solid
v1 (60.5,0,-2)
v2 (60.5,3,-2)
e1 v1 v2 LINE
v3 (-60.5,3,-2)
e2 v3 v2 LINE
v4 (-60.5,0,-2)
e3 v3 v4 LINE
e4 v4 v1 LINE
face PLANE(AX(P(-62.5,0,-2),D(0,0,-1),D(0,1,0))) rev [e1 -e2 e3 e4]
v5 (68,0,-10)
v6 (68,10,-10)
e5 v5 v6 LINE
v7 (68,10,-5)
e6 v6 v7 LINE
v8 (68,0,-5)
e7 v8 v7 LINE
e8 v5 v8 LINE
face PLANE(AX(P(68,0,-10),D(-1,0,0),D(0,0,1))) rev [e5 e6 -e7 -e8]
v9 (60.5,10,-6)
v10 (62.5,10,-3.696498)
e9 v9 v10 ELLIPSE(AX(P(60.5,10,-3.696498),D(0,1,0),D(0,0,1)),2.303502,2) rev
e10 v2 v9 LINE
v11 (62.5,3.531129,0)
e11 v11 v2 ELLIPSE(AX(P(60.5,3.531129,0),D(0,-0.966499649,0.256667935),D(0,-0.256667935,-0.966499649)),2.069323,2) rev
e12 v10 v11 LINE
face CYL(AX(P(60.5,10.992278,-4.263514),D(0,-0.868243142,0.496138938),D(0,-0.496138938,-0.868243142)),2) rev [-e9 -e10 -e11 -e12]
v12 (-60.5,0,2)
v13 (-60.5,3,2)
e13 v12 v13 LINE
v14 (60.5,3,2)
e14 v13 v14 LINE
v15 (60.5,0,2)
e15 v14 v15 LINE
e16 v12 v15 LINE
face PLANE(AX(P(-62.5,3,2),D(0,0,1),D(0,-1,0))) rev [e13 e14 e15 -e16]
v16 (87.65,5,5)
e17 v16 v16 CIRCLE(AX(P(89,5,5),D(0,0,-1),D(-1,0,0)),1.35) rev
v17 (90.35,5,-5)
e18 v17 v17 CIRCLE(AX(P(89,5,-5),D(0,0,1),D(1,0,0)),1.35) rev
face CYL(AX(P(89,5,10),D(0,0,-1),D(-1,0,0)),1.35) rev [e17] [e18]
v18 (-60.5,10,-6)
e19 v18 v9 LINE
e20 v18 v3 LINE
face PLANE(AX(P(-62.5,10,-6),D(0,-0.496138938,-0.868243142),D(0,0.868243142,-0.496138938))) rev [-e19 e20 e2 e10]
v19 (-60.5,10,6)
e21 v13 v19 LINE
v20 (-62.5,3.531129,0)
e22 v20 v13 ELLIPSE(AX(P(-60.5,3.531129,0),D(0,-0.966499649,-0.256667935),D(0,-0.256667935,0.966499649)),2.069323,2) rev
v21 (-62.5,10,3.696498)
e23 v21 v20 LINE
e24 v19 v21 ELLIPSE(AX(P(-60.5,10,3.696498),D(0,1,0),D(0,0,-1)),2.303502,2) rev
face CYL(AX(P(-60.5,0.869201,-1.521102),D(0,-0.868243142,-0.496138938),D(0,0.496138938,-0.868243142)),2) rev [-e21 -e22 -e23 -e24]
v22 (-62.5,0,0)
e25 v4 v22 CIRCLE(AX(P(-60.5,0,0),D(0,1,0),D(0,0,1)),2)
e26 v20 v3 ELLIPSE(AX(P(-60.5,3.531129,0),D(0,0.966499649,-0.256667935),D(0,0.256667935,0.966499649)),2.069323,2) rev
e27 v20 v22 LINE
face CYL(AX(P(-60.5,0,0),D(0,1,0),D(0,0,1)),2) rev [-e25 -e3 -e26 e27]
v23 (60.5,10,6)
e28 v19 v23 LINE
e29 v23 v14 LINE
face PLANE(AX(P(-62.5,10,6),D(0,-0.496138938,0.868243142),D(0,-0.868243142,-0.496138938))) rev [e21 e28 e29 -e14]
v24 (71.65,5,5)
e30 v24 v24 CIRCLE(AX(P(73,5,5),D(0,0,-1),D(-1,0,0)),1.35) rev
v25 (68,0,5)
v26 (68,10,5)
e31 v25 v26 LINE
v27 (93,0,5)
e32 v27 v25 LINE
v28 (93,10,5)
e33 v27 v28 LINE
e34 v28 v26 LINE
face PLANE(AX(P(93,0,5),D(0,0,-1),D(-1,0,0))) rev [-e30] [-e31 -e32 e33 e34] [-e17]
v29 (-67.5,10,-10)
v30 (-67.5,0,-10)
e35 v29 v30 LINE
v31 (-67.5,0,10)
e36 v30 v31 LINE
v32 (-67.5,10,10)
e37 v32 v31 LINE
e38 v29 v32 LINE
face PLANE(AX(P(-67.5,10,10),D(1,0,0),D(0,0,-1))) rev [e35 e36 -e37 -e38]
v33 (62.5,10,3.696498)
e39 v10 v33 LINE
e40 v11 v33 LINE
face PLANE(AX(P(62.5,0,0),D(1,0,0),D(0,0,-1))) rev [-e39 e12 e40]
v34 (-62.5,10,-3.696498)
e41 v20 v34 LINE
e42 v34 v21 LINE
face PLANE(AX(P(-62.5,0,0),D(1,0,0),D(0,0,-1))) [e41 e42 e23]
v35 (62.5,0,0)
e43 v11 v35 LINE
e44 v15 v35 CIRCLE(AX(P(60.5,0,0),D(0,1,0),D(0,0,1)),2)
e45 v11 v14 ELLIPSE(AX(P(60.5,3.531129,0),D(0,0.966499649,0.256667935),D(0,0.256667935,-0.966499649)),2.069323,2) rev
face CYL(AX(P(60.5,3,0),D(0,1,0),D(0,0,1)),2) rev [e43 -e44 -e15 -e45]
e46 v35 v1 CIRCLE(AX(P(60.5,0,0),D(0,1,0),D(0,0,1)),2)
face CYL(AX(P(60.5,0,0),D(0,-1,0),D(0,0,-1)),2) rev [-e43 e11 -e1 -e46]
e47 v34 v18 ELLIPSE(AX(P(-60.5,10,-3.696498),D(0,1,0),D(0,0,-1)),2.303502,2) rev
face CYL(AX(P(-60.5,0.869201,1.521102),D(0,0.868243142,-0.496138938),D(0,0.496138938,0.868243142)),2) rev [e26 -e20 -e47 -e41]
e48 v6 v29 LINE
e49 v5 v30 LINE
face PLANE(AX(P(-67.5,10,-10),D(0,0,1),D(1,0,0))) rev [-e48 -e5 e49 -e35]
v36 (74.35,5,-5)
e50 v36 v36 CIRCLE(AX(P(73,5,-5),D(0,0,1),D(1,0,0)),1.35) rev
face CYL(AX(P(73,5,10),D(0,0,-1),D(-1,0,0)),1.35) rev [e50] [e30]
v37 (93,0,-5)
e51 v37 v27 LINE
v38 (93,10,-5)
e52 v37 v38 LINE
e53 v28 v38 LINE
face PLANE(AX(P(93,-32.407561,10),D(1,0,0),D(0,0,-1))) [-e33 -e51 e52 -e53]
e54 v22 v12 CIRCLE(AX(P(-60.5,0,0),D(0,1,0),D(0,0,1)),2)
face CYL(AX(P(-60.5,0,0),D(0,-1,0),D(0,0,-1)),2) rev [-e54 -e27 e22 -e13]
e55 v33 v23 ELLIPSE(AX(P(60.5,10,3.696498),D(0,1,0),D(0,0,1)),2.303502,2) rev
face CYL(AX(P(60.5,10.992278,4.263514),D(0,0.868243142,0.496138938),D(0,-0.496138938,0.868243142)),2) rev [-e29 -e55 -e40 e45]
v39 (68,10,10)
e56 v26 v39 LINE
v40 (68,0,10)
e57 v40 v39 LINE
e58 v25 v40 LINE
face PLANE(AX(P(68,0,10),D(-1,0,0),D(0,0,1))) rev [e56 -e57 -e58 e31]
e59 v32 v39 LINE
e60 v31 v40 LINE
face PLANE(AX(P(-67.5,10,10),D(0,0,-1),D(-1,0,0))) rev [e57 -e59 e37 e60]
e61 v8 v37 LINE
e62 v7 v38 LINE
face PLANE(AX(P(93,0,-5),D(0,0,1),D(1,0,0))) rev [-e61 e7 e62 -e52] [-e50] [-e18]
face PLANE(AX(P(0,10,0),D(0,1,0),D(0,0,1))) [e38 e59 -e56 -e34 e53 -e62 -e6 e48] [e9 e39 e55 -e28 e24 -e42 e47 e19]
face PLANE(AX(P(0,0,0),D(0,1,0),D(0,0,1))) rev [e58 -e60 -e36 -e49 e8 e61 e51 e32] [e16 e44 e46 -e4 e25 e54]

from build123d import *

# Parameters (mm, degrees)
SKETCH_1_W          = 135
SKETCH_1_H          = 20
EXTRUDE_3_DEPTH     = 10
CUT_EXTRUDE_1_DEPTH = 62.5
FILLET_1_R          = 2
SKETCH_4_W          = 25.5
SKETCH_4_H          = 20
EXTRUDE_5_DEPTH     = 10
SKETCH_5_R          = 1.35
CUT_EXTRUDE_2_DEPTH = 96.650405122
SKETCH_6_W          = 25
SKETCH_6_H          = 5
CUT_EXTRUDE_3_DEPTH = 95.069123521


with BuildPart() as part:
    # 草图1 → 凸台-拉伸3 (new body)
    with BuildSketch(Plane(origin=(0, 0, 0), x_dir=(1, 0, 0), z_dir=(0, 1, 0))):
        Rectangle(SKETCH_1_W, SKETCH_1_H)
    extrude(amount=EXTRUDE_3_DEPTH)

    # 草图2 → 切除-拉伸1 (cut, symmetric)
    with BuildSketch(Plane(origin=(0, 0, 0), x_dir=(0, 0, -1), z_dir=(1, 0, 0))):
        Polygon((-6, 10), (-2, 3), (-2, 0), (2, 0), (2, 3), (6, 10), align=None)
    extrude(amount=CUT_EXTRUDE_1_DEPTH, both=True, mode=Mode.SUBTRACT)

    # 圆角1
    fillet_1_edges = [part.edges().sort_by_distance(p)[0] for p in [
        (62.5, 6.5, 4),
        (62.5, 6.5, -4),
        (-62.5, 6.5, -4),
        (-62.5, 6.5, 4),
        (-62.5, 1.5, -2),
        (62.5, 1.5, -2),
        (62.5, 1.5, 2),
        (-62.5, 1.5, 2),
    ]]
    fillet(fillet_1_edges, radius=FILLET_1_R - 0.0001)  # a hair under: the kernel refuses the full size

    # 草图4 → 凸台-拉伸5 (add)
    with BuildSketch(Plane(origin=(0, 10, 0), x_dir=(1, 0, 0), z_dir=(0, 1, 0))):
        with Locations((80.25, 0)):
            Rectangle(SKETCH_4_W, SKETCH_4_H)
    extrude(amount=-EXTRUDE_5_DEPTH)

    # 草图5 → 切除-拉伸2 (cut, through all)
    with BuildSketch(Plane(origin=(0, 0, -10), x_dir=(-1, 0, 0), z_dir=(0, 0, -1))):
        with Locations((-89, 5)):
            Circle(SKETCH_5_R)
        with Locations((-73, 5)):
            Circle(SKETCH_5_R)
    extrude(amount=-CUT_EXTRUDE_2_DEPTH, mode=Mode.SUBTRACT)

    # 草图6 → 切除-拉伸3 (cut, through all)
    with BuildSketch(Plane(origin=(0, 10, 0), x_dir=(1, 0, 0), z_dir=(0, 1, 0))):
        with Locations((80.5, -7.5)):
            Rectangle(SKETCH_6_W, SKETCH_6_H)
        with Locations((80.5, 7.5)):
            Rectangle(SKETCH_6_W, SKETCH_6_H)
    extrude(amount=-CUT_EXTRUDE_3_DEPTH, mode=Mode.SUBTRACT)


solid = part.part
